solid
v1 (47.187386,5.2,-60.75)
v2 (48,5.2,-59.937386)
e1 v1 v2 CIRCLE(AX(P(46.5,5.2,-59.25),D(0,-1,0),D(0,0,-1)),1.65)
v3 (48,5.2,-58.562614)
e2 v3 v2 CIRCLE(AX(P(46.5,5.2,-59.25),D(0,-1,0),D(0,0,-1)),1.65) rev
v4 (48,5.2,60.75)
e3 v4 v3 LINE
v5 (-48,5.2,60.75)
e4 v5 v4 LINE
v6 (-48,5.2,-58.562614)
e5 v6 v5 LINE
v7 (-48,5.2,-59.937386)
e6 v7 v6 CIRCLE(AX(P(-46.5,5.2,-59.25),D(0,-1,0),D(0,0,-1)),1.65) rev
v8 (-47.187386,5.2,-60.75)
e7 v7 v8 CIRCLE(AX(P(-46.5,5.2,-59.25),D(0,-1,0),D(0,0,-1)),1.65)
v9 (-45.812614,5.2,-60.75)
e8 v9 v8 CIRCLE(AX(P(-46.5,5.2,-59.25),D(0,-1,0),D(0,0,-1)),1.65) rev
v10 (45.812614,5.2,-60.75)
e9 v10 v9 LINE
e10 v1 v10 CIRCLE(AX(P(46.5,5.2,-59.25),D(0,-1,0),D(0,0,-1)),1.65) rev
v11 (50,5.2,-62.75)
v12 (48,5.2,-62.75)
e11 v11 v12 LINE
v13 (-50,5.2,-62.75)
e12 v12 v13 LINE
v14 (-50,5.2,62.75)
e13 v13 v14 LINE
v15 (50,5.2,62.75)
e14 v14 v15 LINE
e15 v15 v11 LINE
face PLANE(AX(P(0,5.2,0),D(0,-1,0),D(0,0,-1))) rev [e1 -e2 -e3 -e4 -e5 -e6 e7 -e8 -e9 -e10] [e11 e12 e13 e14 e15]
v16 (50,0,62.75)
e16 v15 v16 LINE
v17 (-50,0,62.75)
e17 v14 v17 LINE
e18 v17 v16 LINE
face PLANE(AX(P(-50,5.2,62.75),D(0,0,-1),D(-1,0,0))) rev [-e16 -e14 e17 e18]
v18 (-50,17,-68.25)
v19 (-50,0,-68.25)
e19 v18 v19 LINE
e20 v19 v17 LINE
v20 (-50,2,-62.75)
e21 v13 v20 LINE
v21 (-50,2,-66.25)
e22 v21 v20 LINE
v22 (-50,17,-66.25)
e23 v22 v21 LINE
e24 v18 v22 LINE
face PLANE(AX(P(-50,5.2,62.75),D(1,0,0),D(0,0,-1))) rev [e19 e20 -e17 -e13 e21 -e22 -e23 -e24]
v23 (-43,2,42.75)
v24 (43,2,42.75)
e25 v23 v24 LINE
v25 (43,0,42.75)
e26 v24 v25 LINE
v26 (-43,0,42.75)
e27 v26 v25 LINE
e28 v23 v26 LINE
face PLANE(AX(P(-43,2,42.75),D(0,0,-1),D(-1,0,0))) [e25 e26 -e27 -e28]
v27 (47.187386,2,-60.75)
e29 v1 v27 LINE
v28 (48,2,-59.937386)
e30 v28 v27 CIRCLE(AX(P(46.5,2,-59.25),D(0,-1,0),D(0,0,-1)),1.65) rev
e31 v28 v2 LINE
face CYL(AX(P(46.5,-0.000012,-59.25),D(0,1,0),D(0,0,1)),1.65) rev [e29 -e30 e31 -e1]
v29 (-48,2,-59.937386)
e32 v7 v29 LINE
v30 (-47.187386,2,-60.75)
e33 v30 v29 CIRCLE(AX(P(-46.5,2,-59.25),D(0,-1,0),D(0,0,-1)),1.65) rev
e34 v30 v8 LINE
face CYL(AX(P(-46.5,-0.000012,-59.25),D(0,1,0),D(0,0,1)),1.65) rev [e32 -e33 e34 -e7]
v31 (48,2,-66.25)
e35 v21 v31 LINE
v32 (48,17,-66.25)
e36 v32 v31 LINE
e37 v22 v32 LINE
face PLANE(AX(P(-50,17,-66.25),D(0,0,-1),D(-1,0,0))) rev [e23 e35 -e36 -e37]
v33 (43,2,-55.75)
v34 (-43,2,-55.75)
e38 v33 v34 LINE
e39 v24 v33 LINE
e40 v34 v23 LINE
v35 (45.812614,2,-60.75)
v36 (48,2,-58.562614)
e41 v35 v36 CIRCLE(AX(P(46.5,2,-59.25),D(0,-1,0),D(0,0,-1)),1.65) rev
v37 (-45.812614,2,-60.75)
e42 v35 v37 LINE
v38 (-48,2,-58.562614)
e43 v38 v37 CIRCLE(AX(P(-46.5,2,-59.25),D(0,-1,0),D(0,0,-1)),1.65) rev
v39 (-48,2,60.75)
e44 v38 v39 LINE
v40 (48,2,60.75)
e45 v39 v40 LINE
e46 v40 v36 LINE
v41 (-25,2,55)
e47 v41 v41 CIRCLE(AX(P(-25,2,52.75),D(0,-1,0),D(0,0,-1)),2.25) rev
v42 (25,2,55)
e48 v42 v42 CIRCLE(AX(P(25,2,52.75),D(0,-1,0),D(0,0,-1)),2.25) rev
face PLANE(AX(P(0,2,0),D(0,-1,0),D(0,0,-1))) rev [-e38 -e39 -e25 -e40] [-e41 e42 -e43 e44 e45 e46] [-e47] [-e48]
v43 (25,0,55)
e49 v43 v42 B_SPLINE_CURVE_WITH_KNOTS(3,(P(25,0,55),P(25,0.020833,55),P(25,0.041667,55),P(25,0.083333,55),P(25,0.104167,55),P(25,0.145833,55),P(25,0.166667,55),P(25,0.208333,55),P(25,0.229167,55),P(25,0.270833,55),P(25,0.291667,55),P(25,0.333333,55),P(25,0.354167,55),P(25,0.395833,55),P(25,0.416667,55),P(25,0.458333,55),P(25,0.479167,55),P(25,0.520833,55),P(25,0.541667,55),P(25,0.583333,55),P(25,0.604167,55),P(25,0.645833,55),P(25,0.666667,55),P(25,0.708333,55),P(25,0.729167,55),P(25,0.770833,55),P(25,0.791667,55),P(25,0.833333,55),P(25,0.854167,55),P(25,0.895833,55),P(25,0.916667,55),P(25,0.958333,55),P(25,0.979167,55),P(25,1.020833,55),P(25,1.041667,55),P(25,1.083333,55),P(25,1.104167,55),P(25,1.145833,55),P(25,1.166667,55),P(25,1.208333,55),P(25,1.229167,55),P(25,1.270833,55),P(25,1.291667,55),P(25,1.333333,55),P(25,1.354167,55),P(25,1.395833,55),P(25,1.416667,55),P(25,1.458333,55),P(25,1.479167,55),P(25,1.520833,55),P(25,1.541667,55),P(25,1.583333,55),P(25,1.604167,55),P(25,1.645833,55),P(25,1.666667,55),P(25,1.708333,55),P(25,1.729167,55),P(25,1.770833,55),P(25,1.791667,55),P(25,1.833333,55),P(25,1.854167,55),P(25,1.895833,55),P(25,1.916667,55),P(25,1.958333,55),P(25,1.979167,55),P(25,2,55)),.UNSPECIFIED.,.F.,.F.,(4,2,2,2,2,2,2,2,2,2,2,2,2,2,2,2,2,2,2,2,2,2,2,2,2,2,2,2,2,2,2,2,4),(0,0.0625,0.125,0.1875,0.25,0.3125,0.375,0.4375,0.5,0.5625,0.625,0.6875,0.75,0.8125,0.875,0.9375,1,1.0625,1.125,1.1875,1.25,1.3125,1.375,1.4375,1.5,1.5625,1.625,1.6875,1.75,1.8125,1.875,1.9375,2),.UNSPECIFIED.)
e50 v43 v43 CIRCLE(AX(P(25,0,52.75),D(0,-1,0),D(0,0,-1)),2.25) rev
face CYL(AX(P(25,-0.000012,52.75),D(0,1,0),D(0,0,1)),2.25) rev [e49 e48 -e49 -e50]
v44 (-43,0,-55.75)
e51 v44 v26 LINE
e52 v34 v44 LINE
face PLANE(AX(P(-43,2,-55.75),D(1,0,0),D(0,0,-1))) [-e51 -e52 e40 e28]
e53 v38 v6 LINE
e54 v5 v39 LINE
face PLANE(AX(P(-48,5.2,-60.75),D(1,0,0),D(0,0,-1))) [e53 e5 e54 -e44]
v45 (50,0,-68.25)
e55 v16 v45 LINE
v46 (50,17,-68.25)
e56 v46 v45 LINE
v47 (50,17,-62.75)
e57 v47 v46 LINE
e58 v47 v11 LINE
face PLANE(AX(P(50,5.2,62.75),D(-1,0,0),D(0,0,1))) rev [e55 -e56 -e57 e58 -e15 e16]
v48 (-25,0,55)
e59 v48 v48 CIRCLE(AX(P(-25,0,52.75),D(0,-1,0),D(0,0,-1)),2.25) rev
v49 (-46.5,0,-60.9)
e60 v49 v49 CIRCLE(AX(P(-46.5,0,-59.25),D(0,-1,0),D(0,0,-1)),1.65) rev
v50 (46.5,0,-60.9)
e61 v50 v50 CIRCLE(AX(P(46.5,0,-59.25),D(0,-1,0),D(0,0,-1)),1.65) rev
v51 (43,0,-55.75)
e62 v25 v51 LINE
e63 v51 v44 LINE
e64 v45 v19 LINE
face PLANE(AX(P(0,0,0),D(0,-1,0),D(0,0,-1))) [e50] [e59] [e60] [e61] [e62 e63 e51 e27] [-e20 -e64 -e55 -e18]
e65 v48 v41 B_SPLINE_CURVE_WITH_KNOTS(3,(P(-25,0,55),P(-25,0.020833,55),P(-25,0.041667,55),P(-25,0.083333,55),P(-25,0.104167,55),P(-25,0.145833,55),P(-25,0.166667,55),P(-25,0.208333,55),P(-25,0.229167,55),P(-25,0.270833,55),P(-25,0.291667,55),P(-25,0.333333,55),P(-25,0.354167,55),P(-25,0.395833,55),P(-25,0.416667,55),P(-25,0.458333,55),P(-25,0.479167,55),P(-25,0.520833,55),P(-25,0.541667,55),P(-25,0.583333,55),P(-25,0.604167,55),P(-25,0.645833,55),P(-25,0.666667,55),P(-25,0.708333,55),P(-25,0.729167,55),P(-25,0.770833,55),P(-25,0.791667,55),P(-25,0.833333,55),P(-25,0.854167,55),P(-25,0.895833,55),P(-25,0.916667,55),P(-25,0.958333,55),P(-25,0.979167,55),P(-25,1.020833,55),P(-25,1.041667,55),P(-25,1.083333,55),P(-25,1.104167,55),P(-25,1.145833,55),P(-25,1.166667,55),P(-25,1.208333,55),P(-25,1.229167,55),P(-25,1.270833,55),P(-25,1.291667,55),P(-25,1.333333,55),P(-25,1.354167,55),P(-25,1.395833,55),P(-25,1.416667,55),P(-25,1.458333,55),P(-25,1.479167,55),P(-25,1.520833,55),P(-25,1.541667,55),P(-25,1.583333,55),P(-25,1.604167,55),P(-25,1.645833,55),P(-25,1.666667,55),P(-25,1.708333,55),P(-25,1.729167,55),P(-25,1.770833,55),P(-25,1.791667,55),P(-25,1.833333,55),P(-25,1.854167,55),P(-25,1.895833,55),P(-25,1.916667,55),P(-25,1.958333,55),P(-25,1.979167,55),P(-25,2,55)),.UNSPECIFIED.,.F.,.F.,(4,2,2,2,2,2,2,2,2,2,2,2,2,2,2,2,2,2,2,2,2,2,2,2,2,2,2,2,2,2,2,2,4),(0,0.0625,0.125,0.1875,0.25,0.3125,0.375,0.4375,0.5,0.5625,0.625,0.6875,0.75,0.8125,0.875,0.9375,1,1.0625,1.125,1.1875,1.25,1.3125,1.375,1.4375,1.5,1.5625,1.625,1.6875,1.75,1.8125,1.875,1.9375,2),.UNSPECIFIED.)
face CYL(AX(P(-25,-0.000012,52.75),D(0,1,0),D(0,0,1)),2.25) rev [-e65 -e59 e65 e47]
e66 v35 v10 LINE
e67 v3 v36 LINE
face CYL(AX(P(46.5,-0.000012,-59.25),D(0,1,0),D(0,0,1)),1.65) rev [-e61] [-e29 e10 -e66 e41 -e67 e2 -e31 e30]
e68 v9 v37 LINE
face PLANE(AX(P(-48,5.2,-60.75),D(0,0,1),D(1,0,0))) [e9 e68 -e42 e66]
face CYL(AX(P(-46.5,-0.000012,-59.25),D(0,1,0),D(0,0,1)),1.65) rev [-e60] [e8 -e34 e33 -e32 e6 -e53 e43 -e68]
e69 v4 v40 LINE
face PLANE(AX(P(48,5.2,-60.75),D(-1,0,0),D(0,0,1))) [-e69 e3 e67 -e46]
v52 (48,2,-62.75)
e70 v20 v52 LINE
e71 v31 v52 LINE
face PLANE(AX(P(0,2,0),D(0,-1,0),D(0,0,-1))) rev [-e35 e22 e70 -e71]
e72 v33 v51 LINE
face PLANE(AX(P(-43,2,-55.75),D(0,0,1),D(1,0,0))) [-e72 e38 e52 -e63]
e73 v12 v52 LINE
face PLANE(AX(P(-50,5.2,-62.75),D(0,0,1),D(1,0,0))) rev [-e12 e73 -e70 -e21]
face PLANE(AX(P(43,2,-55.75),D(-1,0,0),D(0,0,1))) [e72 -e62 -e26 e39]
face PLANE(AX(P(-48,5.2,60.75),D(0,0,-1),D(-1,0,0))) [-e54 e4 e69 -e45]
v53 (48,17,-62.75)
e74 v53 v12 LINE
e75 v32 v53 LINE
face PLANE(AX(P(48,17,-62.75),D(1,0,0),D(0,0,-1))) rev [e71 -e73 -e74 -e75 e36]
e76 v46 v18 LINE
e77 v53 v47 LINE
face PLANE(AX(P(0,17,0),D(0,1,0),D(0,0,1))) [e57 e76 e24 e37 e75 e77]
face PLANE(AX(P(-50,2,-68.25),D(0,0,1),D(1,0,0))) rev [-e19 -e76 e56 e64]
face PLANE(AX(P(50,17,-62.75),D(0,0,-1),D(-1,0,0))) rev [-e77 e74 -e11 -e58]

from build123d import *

# Parameters (mm, degrees)
SKETCH1_W                      = 96
SKETCH1_H                      = 121.5
SKETCH1_W_2                    = 86
SKETCH1_H_2                    = 98.5
BOSS_EXTRUDE1_DEPTH            = 2
SKETCH2_W                      = 100
SKETCH2_H                      = 125.5
SKETCH2_W_2                    = 96
SKETCH2_H_2                    = 121.5
BOSS_EXTRUDE2_DEPTH            = 5.2
CUT_EXTRUDE1_REACH             = 82.403
SKETCH3_R                      = 2.25
SKETCH3_R_2                    = 1.65
CUT_EXTRUDE1_DIRECTION_2_DEPTH = 81.402751819
FILLET1_R                      = 1.65
SKETCH4_W                      = 100
SKETCH4_H                      = 5.5
BOSS_EXTRUDE3_DEPTH            = 2
BOSS_EXTRUDE5_DEPTH            = 15


with BuildPart() as part:
    # Sketch1 → Boss-Extrude1 (new body)
    with BuildSketch(Plane(origin=(0, 0, 0), x_dir=(1, 0, 0), z_dir=(0, 1, 0))):
        Rectangle(SKETCH1_W, SKETCH1_H)
        with Locations((0, 6.5)):
            Rectangle(SKETCH1_W_2, SKETCH1_H_2, mode=Mode.SUBTRACT)
    extrude(amount=BOSS_EXTRUDE1_DEPTH)

    # Sketch2 → Boss-Extrude2 (add)
    with BuildSketch(Plane(origin=(0, 0, 0), x_dir=(1, 0, 0), z_dir=(0, 1, 0))):
        Rectangle(SKETCH2_W, SKETCH2_H)
        Rectangle(SKETCH2_W_2, SKETCH2_H_2, mode=Mode.SUBTRACT)
    extrude(amount=BOSS_EXTRUDE2_DEPTH)

    # Sketch3 → Cut-Extrude1 (cut, up to next)
    with BuildSketch(Plane.XZ, mode=Mode.PRIVATE) as cut_extrude1_sk1:
        with Locations(Location((25, 52.75, 0), (0, 0, 90))):
            Circle(SKETCH3_R)
    cut_extrude1_tool1 = extrude(cut_extrude1_sk1.sketch, amount=-CUT_EXTRUDE1_REACH, mode=Mode.PRIVATE) & part.part
    # Sketch3 → Cut-Extrude1 (cut, up to next)
    with BuildSketch(Plane.XZ, mode=Mode.PRIVATE) as cut_extrude1_sk2:
        with Locations(Location((-25, 52.75, 0), (0, 0, 90))):
            Circle(SKETCH3_R)
    cut_extrude1_tool2 = extrude(cut_extrude1_sk2.sketch, amount=-CUT_EXTRUDE1_REACH, mode=Mode.PRIVATE) & part.part
    # Sketch3 → Cut-Extrude1 (cut, up to next)
    with BuildSketch(Plane.XZ, mode=Mode.PRIVATE) as cut_extrude1_sk3:
        with Locations(Location((46.5, -59.25, 0), (0, 0, 24.619977329))):
            Circle(SKETCH3_R_2)
    cut_extrude1_tool3 = extrude(cut_extrude1_sk3.sketch, amount=-CUT_EXTRUDE1_REACH, mode=Mode.PRIVATE) & part.part
    # Sketch3 → Cut-Extrude1 (cut, up to next)
    with BuildSketch(Plane.XZ, mode=Mode.PRIVATE) as cut_extrude1_sk4:
        with Locations(Location((-46.5, -59.25, 0), (0, 0, 155.380022671))):
            Circle(SKETCH3_R_2)
    cut_extrude1_tool4 = extrude(cut_extrude1_sk4.sketch, amount=-CUT_EXTRUDE1_REACH, mode=Mode.PRIVATE) & part.part
    add(cut_extrude1_tool1.solids().sort_by_distance((25, 0, 52.75))[0], mode=Mode.SUBTRACT)
    add(cut_extrude1_tool2.solids().sort_by_distance((-25, 0, 52.75))[0], mode=Mode.SUBTRACT)
    add(cut_extrude1_tool3.solids().sort_by_distance((46.5, 0, -59.25))[0], mode=Mode.SUBTRACT)
    add(cut_extrude1_tool4.solids().sort_by_distance((-46.5, 0, -59.25))[0], mode=Mode.SUBTRACT)

    # Sketch3 → Cut-Extrude1 direction 2 (cut)
    with BuildSketch(Plane.XZ):
        with Locations(Location((25, 52.75, 0), (0, 0, 90))):
            Circle(SKETCH3_R)
        with Locations(Location((-25, 52.75, 0), (0, 0, 90))):
            Circle(SKETCH3_R)
        with Locations(Location((46.5, -59.25, 0), (0, 0, 24.619977329))):
            Circle(SKETCH3_R_2)
        with Locations(Location((-46.5, -59.25, 0), (0, 0, 155.380022671))):
            Circle(SKETCH3_R_2)
    extrude(amount=CUT_EXTRUDE1_DIRECTION_2_DEPTH, mode=Mode.SUBTRACT)

    # Fillet1
    # the kernel refuses this fillet: 1.65 mm, written as the material it adds along each edge
    with BuildSketch(Plane(origin=(48, 2, -60.75), x_dir=(0, 0, 1), z_dir=(0, 1, 0))) as fillet1_piece_1_section:
        with BuildLine():
            CenterArc((FILLET1_R, -FILLET1_R), FILLET1_R, 90, 90)
            Line((0, -FILLET1_R), (0, 0))
            Line((0, 0), (FILLET1_R, 0))
        make_face()
    fillet1_piece_1 = extrude(amount=3.2, mode=Mode.PRIVATE)
    fillet1_piece_1 = fillet1_piece_1 - Plane(origin=(46.5, 3.6, -59.25), x_dir=(0.9090909090884159, 0, 0.4165977904559716), z_dir=(0, -1, 0)) * Cylinder(1.65, 13, mode=Mode.PRIVATE)
    add(fillet1_piece_1)
    with BuildSketch(Plane(origin=(-48, 2, -60.75), x_dir=(1, 0, 0), z_dir=(0, 1, 0))) as fillet1_piece_2_section:
        with BuildLine():
            CenterArc((FILLET1_R, -FILLET1_R), FILLET1_R, 90, 90)
            Line((0, -FILLET1_R), (0, 0))
            Line((0, 0), (FILLET1_R, 0))
        make_face()
    fillet1_piece_2 = extrude(amount=3.2, mode=Mode.PRIVATE)
    fillet1_piece_2 = fillet1_piece_2 - Plane(origin=(-46.5, 3.6, -59.25), x_dir=(-0.9090909090884159, 0, 0.4165977904559715), z_dir=(0, -1, 0)) * Cylinder(1.65, 14, mode=Mode.PRIVATE)
    add(fillet1_piece_2)

    # Sketch4 → Boss-Extrude3 (add)
    with BuildSketch(Plane(origin=(0, 0, 0), x_dir=(1, 0, 0), z_dir=(0, 1, 0))):
        with Locations((0, 65.5)):
            Rectangle(SKETCH4_W, SKETCH4_H)
    extrude(amount=BOSS_EXTRUDE3_DEPTH)

    # Sketch7 → Boss-Extrude5 (add)
    with BuildSketch(Plane(origin=(0, 2, 0), x_dir=(1, 0, 0), z_dir=(0, 1, 0))):
        Polygon((-50, 68.25), (50, 68.25), (50, 62.75), (48, 62.75), (48, 66.25), (-50, 66.25), align=None)
    extrude(amount=BOSS_EXTRUDE5_DEPTH)


solid = part.part
